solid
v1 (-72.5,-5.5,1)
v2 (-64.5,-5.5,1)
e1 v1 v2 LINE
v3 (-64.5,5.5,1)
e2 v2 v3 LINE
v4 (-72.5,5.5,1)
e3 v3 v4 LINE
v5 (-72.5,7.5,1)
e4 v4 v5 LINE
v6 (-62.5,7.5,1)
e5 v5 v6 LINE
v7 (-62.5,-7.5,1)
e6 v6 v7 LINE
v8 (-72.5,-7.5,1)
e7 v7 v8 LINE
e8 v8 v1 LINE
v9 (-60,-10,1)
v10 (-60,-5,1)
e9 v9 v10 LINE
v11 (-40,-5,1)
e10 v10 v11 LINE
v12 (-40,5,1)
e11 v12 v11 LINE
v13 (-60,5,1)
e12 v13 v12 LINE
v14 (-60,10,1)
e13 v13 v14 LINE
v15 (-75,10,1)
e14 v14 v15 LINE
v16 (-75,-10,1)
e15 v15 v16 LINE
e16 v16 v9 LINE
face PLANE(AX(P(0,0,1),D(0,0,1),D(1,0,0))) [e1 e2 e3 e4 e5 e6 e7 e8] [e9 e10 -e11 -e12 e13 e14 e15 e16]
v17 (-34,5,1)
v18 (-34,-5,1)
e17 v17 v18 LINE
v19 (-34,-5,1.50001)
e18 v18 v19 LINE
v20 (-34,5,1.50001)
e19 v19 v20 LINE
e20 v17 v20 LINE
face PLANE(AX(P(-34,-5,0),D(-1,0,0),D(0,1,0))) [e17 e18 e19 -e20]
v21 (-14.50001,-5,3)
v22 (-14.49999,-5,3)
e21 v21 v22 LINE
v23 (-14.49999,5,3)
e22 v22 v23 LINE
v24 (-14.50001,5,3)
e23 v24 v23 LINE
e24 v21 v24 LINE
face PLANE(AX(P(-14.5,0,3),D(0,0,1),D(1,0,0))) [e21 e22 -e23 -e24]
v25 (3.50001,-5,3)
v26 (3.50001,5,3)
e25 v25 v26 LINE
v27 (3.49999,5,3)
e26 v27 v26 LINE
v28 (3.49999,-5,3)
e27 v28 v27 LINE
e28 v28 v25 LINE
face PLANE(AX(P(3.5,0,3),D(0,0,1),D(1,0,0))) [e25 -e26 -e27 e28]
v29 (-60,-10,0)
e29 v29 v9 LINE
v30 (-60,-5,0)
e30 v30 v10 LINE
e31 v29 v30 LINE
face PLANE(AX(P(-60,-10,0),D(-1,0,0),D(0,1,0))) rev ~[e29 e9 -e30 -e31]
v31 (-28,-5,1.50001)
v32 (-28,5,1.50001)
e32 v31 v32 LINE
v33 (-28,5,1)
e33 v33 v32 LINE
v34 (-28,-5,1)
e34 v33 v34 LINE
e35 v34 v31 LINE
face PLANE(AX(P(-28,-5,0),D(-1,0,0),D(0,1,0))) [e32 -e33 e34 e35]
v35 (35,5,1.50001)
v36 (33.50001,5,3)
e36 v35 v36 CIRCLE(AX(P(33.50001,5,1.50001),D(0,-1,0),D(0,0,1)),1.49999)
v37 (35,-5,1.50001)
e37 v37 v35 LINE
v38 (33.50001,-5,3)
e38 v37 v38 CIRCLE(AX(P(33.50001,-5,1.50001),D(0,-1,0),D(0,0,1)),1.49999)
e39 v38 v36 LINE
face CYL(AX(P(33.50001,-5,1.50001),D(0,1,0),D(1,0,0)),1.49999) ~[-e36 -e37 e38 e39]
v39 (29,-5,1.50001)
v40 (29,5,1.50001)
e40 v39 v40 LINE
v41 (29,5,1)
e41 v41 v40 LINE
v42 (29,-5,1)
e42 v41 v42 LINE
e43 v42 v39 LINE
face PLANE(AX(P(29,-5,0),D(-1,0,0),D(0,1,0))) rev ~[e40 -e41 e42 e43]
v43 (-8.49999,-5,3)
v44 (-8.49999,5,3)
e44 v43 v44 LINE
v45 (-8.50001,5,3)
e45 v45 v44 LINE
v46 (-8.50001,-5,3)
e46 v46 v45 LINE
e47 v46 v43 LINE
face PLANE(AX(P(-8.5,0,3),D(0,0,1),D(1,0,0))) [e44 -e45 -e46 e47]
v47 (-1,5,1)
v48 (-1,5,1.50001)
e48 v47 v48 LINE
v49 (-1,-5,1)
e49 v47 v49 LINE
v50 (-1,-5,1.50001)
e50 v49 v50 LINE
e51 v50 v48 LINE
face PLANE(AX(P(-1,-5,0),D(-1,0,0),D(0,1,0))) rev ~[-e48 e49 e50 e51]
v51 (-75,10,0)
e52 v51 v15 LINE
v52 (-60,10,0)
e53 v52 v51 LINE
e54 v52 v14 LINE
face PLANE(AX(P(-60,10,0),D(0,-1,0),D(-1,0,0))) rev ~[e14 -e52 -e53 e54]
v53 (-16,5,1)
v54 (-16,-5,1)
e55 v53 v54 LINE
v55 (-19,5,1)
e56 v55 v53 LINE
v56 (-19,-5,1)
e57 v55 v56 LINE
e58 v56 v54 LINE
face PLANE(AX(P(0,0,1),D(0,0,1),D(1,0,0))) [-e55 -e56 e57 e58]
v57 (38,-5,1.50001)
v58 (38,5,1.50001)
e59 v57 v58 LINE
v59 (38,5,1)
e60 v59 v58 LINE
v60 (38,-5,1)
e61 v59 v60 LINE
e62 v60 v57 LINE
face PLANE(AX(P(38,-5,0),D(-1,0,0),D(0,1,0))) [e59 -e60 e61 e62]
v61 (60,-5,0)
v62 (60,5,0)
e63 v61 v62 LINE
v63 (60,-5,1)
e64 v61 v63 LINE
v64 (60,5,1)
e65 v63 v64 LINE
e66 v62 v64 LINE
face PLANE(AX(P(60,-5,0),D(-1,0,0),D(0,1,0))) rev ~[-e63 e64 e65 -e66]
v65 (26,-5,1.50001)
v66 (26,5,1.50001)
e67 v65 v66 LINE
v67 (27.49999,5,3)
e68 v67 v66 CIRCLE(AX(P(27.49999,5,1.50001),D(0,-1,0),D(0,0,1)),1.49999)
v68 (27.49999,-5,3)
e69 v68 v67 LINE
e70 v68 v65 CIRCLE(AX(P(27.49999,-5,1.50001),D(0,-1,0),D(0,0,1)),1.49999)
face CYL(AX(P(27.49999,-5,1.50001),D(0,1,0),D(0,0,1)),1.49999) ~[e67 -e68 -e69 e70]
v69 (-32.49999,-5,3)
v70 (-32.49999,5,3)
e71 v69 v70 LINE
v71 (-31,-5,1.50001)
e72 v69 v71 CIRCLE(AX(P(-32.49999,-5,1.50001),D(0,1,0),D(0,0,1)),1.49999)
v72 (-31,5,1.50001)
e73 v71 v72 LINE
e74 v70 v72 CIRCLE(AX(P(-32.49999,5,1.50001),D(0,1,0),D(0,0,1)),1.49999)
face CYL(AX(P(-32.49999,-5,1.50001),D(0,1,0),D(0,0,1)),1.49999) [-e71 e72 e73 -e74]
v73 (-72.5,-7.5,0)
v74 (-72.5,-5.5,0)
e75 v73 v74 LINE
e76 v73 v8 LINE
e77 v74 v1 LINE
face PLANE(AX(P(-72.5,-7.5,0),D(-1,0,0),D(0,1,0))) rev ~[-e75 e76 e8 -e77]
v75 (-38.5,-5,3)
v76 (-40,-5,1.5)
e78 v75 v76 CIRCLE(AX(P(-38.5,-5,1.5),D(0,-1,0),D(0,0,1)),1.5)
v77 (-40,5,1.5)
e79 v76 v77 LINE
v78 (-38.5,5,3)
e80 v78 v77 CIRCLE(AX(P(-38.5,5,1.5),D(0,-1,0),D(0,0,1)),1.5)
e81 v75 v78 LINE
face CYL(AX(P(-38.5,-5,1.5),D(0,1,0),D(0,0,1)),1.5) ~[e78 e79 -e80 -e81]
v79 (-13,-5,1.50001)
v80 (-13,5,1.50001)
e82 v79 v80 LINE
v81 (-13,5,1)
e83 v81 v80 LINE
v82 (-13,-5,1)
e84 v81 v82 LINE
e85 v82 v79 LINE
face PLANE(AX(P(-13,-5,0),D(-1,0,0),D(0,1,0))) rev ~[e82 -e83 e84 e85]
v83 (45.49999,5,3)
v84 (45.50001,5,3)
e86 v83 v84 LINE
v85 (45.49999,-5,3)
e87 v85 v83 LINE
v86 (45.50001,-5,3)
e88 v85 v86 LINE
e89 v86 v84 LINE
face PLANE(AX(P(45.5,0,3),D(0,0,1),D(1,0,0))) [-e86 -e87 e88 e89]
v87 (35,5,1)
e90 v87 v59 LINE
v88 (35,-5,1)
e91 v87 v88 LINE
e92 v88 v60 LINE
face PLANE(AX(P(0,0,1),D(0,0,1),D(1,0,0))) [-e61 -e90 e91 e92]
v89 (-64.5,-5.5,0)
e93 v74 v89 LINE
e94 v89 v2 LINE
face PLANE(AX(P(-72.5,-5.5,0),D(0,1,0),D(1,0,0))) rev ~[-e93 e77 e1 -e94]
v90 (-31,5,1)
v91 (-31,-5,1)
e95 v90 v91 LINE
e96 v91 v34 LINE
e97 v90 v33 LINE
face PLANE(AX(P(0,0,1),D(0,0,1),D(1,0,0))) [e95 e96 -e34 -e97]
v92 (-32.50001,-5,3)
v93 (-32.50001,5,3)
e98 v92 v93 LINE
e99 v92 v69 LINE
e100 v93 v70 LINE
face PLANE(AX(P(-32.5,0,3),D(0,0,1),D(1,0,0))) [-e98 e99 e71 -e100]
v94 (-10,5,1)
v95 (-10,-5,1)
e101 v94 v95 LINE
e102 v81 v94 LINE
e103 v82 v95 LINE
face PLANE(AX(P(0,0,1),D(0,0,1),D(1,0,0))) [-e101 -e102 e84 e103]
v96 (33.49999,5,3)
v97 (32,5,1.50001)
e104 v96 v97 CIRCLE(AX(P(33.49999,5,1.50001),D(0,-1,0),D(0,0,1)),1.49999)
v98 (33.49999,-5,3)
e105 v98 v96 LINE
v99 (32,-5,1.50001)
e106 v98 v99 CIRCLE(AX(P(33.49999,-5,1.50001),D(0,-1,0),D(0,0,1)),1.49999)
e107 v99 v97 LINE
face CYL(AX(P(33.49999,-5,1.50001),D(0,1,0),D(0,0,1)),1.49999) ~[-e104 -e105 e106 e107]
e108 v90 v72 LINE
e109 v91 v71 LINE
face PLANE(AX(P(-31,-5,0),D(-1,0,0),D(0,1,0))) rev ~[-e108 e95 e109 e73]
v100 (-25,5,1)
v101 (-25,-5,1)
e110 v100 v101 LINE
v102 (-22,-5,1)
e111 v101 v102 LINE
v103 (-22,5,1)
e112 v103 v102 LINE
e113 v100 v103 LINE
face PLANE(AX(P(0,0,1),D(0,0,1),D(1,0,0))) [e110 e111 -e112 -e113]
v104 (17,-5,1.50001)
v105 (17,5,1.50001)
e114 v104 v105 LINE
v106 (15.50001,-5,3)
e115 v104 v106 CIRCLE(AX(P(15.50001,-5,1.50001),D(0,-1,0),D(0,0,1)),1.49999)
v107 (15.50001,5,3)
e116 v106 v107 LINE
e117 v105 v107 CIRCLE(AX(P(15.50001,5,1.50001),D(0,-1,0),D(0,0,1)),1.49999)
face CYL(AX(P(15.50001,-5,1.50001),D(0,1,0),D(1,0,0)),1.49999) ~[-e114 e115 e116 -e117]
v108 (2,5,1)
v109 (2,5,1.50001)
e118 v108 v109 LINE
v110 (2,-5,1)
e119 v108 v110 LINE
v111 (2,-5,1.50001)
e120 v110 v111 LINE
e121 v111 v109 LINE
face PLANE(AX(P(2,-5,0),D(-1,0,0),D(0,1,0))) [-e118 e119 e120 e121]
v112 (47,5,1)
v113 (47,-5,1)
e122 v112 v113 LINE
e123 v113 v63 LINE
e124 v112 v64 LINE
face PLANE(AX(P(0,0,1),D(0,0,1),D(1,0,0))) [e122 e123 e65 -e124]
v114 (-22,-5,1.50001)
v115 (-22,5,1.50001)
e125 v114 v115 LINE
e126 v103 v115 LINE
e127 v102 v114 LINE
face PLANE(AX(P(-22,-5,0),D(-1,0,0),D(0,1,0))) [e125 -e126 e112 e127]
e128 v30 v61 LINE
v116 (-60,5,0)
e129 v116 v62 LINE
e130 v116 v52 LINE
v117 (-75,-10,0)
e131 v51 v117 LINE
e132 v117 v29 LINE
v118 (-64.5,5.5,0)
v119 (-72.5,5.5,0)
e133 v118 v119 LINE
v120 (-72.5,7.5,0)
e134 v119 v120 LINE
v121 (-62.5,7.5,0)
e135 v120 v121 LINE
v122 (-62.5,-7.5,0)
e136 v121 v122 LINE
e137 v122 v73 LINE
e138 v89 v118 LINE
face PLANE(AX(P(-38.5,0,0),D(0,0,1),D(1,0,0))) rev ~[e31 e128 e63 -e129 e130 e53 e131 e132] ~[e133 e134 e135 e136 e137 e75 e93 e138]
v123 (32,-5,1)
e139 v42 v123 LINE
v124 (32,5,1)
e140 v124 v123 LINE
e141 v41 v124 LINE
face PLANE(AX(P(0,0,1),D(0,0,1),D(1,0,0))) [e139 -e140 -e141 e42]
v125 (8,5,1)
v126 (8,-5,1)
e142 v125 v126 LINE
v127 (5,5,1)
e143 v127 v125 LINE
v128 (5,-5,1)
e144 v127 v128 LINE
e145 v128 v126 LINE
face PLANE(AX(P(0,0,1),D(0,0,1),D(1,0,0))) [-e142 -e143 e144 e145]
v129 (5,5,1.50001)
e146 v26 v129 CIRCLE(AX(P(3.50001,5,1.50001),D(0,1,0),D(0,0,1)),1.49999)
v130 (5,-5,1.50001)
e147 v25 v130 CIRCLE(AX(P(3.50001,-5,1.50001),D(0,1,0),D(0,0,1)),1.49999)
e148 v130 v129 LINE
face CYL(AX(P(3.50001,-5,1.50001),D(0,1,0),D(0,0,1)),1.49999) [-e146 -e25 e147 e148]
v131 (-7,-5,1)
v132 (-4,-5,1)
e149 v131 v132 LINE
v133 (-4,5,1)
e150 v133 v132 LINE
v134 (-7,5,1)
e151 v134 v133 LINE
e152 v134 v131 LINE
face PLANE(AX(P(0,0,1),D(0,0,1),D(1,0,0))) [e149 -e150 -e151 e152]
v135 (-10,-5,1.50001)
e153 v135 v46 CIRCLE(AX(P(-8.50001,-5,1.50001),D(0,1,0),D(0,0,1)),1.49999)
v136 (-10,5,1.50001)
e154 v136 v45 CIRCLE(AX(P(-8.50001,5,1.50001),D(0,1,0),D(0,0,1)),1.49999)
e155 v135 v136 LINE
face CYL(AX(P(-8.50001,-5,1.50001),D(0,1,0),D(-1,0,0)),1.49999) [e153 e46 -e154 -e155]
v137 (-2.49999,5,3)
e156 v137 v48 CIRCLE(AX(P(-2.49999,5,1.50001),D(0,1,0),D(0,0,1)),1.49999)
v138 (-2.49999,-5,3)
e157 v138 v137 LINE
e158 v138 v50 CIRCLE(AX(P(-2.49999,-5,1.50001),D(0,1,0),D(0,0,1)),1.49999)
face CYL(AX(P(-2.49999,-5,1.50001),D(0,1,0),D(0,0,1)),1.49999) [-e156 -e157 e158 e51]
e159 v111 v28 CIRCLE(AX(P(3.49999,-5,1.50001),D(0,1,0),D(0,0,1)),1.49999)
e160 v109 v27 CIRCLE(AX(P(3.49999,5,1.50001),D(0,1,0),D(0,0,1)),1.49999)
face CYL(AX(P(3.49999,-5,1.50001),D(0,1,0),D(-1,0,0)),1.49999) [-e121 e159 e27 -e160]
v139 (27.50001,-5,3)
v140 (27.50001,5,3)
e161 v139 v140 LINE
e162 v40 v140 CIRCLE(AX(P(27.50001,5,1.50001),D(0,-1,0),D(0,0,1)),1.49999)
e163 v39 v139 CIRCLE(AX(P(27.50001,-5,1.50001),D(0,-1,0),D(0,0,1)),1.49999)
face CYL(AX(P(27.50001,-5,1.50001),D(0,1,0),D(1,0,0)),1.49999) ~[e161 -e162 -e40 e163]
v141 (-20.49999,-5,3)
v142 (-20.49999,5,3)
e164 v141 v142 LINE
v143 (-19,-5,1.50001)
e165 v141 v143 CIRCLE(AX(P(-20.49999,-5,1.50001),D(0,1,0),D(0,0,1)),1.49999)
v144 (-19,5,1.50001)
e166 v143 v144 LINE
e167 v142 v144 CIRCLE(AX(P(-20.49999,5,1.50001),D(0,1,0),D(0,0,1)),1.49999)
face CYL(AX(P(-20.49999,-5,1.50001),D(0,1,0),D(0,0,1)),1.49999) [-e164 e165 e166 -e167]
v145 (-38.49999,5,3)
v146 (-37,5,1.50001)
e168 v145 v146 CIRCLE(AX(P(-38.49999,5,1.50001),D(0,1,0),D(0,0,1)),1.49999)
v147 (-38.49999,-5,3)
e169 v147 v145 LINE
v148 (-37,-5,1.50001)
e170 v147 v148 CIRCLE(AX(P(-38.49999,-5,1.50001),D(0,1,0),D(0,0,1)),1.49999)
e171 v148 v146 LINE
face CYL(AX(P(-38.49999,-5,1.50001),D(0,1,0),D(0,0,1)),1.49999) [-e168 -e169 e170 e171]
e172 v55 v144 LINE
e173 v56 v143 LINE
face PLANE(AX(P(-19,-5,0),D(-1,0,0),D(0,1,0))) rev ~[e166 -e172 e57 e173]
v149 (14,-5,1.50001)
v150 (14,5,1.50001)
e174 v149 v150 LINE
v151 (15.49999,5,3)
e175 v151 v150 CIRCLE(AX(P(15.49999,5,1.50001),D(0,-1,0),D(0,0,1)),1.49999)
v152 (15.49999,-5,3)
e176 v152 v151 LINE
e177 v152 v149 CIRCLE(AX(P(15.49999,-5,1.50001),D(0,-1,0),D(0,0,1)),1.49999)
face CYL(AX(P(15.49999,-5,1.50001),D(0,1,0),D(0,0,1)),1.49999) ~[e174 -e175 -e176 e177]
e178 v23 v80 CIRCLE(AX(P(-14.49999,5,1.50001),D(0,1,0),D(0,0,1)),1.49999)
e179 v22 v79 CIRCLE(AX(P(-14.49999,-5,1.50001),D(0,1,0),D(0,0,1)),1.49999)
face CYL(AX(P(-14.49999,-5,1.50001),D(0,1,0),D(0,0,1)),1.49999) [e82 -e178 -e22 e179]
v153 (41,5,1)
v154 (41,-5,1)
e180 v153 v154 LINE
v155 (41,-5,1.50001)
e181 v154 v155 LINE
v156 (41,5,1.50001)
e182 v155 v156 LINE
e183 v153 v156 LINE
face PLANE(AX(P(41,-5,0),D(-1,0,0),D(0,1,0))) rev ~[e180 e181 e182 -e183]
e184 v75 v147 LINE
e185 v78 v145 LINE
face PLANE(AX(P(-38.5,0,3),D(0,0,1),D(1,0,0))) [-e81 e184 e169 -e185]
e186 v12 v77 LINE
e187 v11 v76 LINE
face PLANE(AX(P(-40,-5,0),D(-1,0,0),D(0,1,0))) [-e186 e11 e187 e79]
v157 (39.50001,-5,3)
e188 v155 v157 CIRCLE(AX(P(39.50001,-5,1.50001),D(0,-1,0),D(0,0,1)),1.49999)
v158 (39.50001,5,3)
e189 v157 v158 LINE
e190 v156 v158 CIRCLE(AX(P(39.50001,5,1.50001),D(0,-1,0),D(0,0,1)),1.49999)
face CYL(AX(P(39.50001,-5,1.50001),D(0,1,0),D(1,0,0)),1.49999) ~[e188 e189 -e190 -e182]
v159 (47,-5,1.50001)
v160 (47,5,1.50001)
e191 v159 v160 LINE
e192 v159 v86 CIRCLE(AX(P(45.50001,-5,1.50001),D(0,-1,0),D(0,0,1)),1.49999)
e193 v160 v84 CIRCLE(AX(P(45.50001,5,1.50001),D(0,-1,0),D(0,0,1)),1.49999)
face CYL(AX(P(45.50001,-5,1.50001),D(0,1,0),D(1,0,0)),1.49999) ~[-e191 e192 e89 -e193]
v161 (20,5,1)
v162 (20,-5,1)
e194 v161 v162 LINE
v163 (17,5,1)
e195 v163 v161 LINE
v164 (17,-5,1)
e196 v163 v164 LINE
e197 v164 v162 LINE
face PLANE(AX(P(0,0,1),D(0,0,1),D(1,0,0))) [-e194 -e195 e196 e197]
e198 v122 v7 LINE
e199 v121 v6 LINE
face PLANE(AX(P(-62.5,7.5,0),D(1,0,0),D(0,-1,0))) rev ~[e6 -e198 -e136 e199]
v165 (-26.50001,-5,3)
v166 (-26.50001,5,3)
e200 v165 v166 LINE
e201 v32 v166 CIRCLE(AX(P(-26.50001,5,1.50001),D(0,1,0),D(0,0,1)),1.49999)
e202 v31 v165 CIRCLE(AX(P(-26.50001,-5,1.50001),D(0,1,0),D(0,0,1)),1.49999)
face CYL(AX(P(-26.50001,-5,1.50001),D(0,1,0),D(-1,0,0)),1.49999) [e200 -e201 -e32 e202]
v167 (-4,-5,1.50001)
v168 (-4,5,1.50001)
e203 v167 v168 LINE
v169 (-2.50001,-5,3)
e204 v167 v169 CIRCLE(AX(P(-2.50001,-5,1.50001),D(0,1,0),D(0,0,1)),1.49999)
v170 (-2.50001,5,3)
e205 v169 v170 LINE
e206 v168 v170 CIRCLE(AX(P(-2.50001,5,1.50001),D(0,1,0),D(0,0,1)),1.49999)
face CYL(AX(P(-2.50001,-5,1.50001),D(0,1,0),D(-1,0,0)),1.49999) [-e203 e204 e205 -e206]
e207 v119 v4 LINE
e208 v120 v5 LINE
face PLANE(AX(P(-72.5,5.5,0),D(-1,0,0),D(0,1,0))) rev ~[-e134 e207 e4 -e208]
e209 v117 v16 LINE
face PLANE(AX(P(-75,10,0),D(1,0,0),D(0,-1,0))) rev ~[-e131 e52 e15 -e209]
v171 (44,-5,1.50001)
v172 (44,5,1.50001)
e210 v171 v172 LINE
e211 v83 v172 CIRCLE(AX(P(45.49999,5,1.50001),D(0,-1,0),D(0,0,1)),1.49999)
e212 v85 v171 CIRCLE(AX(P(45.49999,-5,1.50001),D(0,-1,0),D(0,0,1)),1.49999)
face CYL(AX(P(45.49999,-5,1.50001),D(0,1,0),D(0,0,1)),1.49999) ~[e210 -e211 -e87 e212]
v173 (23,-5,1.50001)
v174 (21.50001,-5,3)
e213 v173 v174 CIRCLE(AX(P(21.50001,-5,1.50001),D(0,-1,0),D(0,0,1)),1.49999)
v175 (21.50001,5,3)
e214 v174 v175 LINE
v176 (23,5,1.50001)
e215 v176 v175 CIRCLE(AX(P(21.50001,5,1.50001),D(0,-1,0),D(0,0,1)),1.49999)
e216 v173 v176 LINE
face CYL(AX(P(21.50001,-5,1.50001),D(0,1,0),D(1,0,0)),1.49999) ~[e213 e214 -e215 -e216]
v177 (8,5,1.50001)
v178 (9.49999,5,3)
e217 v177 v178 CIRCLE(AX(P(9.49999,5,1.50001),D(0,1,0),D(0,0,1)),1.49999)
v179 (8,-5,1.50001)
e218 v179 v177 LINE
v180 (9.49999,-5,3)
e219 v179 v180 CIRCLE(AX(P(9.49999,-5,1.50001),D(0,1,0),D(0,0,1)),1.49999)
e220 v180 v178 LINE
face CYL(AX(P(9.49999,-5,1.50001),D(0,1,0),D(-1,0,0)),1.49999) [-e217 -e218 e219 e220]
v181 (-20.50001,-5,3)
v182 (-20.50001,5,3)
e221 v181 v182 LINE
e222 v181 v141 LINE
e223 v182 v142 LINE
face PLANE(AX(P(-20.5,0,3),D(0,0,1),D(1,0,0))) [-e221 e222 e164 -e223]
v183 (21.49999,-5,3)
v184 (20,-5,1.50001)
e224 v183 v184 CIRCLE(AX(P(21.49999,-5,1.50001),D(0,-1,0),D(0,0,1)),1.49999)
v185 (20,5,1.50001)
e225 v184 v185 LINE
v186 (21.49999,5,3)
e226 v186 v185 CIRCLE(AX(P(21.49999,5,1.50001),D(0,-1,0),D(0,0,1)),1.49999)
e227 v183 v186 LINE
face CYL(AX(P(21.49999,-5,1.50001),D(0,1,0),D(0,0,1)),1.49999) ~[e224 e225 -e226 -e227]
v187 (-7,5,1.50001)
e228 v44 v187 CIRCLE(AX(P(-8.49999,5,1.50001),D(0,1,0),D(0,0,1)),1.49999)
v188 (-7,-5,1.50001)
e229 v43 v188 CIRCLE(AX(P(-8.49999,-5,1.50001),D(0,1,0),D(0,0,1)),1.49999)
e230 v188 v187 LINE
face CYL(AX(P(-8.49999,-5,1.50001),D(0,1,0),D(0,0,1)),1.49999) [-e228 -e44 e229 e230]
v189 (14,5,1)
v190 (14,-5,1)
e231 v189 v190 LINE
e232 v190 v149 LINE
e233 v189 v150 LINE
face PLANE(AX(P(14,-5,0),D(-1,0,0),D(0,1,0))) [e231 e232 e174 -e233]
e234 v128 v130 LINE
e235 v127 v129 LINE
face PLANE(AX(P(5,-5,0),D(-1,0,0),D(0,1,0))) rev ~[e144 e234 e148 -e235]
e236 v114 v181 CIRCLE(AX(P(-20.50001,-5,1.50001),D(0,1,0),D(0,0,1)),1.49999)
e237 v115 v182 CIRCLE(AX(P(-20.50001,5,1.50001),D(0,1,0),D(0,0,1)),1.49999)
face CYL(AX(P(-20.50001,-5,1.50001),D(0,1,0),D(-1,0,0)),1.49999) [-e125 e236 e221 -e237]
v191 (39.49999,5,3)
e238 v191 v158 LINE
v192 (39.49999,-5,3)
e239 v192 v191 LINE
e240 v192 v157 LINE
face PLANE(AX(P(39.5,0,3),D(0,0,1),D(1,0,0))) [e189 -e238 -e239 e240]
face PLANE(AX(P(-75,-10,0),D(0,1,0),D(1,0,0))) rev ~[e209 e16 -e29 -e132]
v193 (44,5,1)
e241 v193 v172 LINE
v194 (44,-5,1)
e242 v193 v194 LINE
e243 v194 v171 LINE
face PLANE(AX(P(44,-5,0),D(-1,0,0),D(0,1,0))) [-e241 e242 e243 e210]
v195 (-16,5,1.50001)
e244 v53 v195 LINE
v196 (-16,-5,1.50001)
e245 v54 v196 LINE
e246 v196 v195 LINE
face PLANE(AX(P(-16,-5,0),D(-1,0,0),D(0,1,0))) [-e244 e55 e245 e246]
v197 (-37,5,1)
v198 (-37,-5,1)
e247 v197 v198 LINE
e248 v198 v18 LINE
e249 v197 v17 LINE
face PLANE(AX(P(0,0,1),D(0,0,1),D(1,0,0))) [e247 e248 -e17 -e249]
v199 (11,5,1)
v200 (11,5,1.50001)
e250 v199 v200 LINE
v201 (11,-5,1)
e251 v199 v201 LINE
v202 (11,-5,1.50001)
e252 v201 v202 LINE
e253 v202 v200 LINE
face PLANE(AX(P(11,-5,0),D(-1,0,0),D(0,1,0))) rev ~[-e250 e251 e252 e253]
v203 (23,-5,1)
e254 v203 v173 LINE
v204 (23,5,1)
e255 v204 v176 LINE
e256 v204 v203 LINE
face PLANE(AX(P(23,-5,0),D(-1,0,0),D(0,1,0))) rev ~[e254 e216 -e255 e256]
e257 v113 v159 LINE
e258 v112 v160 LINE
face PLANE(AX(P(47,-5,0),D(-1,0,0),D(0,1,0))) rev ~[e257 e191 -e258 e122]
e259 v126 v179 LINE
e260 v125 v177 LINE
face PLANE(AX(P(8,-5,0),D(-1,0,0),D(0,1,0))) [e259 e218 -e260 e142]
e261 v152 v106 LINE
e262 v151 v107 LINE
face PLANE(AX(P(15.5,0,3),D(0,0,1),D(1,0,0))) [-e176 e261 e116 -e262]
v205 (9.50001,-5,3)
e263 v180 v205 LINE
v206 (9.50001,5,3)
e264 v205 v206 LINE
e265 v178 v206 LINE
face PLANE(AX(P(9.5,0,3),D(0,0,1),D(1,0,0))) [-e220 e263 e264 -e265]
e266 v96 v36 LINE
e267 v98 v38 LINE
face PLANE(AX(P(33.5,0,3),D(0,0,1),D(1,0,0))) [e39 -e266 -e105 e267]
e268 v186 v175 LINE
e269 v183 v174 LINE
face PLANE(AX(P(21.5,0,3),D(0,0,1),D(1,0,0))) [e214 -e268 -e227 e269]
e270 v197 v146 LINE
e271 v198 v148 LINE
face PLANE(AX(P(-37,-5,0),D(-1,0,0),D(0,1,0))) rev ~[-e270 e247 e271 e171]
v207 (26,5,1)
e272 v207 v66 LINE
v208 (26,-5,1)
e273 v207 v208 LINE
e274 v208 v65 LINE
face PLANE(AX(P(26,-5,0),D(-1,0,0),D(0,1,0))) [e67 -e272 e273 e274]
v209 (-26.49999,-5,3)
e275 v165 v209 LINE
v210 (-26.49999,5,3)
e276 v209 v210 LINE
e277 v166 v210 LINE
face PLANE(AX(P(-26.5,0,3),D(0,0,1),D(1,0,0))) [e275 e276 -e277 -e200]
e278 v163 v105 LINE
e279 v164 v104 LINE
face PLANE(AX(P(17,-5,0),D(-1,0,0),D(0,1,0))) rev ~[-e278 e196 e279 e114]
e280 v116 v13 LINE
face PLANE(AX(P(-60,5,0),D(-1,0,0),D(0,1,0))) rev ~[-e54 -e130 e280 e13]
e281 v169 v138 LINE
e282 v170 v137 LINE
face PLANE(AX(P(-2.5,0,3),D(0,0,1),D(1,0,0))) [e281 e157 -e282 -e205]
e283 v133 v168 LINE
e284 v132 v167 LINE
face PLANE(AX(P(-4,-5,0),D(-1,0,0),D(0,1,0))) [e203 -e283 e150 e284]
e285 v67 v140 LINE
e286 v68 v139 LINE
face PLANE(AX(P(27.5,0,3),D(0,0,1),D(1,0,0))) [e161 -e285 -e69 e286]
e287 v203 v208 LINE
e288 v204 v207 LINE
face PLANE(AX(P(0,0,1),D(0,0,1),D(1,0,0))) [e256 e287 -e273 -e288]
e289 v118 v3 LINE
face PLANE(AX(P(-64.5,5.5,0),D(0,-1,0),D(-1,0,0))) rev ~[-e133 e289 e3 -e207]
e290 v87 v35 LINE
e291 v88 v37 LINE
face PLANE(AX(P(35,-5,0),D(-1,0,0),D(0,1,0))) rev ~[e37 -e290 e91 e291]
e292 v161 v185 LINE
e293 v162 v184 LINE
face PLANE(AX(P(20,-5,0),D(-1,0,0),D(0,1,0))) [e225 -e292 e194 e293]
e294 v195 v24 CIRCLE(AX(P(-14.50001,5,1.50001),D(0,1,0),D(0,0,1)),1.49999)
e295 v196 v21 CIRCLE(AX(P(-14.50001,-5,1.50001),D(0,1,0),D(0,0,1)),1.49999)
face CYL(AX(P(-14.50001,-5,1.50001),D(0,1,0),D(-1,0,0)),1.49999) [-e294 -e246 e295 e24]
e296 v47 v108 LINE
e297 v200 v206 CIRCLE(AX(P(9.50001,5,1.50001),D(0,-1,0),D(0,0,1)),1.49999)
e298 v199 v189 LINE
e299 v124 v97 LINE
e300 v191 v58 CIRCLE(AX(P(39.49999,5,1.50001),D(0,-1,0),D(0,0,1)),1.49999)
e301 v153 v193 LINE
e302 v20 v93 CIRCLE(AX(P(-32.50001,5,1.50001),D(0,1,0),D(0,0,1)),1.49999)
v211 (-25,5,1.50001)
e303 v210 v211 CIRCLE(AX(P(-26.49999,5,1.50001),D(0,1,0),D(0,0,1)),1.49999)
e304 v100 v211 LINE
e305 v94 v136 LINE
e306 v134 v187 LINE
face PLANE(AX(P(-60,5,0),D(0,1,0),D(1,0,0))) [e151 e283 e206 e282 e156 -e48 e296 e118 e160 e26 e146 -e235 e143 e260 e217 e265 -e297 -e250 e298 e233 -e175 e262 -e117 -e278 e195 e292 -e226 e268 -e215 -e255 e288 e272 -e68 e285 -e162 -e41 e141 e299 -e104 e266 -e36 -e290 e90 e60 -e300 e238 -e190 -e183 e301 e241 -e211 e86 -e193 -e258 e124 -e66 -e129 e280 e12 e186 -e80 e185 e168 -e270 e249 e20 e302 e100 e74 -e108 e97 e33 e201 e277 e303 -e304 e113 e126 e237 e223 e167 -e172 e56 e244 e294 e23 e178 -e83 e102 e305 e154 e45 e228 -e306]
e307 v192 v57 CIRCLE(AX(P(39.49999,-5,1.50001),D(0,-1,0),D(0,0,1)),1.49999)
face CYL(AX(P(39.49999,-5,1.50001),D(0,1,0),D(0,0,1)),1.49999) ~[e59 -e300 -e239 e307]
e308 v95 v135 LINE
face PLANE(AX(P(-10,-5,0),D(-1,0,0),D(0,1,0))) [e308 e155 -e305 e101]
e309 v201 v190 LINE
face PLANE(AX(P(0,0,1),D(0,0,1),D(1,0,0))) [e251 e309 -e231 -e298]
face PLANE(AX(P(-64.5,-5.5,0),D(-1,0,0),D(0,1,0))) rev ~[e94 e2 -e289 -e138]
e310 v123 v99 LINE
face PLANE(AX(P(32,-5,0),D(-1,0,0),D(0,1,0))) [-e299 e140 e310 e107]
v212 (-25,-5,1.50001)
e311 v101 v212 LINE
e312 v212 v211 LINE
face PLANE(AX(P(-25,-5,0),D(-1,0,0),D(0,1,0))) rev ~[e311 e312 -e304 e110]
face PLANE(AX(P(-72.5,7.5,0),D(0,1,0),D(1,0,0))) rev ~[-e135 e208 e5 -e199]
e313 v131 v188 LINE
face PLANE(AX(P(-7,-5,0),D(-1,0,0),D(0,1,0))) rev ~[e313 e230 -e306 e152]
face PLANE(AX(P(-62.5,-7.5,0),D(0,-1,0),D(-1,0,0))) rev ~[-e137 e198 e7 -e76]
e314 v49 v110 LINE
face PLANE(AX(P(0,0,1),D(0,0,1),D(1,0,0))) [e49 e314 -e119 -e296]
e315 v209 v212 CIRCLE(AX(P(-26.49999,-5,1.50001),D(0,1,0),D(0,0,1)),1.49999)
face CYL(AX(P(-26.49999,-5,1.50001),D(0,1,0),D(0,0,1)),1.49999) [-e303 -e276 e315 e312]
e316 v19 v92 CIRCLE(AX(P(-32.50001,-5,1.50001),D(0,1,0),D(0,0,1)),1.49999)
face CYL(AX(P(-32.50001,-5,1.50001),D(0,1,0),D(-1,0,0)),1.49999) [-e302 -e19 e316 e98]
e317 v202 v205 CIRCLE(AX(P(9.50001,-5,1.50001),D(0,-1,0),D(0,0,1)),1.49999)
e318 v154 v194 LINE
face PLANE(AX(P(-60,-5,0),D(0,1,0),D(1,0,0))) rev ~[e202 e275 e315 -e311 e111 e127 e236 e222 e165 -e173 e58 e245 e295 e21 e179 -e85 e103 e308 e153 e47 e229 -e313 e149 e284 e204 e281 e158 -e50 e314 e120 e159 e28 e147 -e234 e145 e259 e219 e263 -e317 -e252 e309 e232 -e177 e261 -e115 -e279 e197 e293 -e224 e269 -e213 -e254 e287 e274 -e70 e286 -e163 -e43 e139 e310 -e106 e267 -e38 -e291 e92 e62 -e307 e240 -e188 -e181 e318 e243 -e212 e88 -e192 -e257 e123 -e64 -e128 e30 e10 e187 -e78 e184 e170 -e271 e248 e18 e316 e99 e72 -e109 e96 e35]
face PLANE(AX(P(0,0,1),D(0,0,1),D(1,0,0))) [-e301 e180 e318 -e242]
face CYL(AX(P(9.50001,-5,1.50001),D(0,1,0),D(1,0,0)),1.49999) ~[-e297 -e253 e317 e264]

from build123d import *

# Parameters (mm, degrees)
F0_W     = 120
F0_H     = 10
F1_DEPTH = 1
F2_W     = 3
F2_H     = 10
F3_DEPTH = 3
F4_R     = 1.5
F5_R     = 1.49999
F6_R     = 1.49999


# Not quite as in the source:
# - a fillet or chamfer is up to 0.001 mm smaller than in the source, because OpenCascade refuses the exact size


with BuildPart() as f1:
    # F0 (on Top) → F1 (new body)
    with BuildSketch(Plane.XY):
        Rectangle(F0_W, F0_H)
        Polygon((-60, -5), (-60, 5), (-60, 10), (-75, 10), (-75, -10), (-60, -10), align=None)
        Polygon((-72.5, 5.5), (-72.5, 7.5), (-62.5, 7.5), (-62.5, -7.5), (-72.5, -7.5), (-72.5, -5.5), (-64.5, -5.5), (-64.5, 5.5), align=None, mode=Mode.SUBTRACT)
    extrude(amount=F1_DEPTH)

    # F2 (on Top) → F3 (join)
    with BuildSketch(Plane.XY):
        with Locations((-38.5, 0)):
            Rectangle(F2_W, F2_H)
        with Locations((-32.5, 0)):
            Rectangle(F2_W, F2_H)
        with Locations((-26.5, 0)):
            Rectangle(F2_W, F2_H)
        with Locations((-20.5, 0)):
            Rectangle(F2_W, F2_H)
        with Locations((-14.5, 0)):
            Rectangle(F2_W, F2_H)
        with Locations((-8.5, 0)):
            Rectangle(F2_W, F2_H)
        with Locations((-2.5, 0)):
            Rectangle(F2_W, F2_H)
        with Locations((3.5, 0)):
            Rectangle(F2_W, F2_H)
        with Locations((9.5, 0)):
            Rectangle(F2_W, F2_H)
        with Locations((15.5, 0)):
            Rectangle(F2_W, F2_H)
        with Locations((21.5, 0)):
            Rectangle(F2_W, F2_H)
        with Locations((27.5, 0)):
            Rectangle(F2_W, F2_H)
        with Locations((33.5, 0)):
            Rectangle(F2_W, F2_H)
        with Locations((39.5, 0)):
            Rectangle(F2_W, F2_H)
        with Locations((45.5, 0)):
            Rectangle(F2_W, F2_H)
    extrude(amount=F3_DEPTH)

    # F4
    f4_edges = [f1.edges().sort_by_distance(p)[0] for p in [
        (-40, 0, 3),
    ]]
    fillet(f4_edges, radius=F4_R)

    # F5 (radius 1.5 in the source; OpenCascade refuses exactly that, so slightly less here)
    f5_edges = [f1.edges().sort_by_distance(p)[0] for p in [
        (-37, 0, 3),
    ]]
    fillet(f5_edges, radius=F5_R)

    # F6 (radius 1.5 in the source; OpenCascade refuses exactly that, so slightly less here)
    f6_edges = [f1.edges().sort_by_distance(p)[0] for p in [
        (-34, 0, 3),
        (-31, 0, 3),
        (-28, 0, 3),
        (-25, 0, 3),
        (-22, 0, 3),
        (-19, 0, 3),
        (-16, 0, 3),
        (-13, 0, 3),
        (-10, 0, 3),
        (-7, 0, 3),
        (-4, 0, 3),
        (-1, 0, 3),
        (2, 0, 3),
        (5, 0, 3),
        (8, 0, 3),
        (11, 0, 3),
        (14, 0, 3),
        (17, 0, 3),
        (20, 0, 3),
        (23, 0, 3),
        (26, 0, 3),
        (29, 0, 3),
        (32, 0, 3),
        (35, 0, 3),
        (38, 0, 3),
        (41, 0, 3),
        (44, 0, 3),
        (47, 0, 3),
    ]]
    fillet(f6_edges, radius=F6_R)


solid = f1.part
